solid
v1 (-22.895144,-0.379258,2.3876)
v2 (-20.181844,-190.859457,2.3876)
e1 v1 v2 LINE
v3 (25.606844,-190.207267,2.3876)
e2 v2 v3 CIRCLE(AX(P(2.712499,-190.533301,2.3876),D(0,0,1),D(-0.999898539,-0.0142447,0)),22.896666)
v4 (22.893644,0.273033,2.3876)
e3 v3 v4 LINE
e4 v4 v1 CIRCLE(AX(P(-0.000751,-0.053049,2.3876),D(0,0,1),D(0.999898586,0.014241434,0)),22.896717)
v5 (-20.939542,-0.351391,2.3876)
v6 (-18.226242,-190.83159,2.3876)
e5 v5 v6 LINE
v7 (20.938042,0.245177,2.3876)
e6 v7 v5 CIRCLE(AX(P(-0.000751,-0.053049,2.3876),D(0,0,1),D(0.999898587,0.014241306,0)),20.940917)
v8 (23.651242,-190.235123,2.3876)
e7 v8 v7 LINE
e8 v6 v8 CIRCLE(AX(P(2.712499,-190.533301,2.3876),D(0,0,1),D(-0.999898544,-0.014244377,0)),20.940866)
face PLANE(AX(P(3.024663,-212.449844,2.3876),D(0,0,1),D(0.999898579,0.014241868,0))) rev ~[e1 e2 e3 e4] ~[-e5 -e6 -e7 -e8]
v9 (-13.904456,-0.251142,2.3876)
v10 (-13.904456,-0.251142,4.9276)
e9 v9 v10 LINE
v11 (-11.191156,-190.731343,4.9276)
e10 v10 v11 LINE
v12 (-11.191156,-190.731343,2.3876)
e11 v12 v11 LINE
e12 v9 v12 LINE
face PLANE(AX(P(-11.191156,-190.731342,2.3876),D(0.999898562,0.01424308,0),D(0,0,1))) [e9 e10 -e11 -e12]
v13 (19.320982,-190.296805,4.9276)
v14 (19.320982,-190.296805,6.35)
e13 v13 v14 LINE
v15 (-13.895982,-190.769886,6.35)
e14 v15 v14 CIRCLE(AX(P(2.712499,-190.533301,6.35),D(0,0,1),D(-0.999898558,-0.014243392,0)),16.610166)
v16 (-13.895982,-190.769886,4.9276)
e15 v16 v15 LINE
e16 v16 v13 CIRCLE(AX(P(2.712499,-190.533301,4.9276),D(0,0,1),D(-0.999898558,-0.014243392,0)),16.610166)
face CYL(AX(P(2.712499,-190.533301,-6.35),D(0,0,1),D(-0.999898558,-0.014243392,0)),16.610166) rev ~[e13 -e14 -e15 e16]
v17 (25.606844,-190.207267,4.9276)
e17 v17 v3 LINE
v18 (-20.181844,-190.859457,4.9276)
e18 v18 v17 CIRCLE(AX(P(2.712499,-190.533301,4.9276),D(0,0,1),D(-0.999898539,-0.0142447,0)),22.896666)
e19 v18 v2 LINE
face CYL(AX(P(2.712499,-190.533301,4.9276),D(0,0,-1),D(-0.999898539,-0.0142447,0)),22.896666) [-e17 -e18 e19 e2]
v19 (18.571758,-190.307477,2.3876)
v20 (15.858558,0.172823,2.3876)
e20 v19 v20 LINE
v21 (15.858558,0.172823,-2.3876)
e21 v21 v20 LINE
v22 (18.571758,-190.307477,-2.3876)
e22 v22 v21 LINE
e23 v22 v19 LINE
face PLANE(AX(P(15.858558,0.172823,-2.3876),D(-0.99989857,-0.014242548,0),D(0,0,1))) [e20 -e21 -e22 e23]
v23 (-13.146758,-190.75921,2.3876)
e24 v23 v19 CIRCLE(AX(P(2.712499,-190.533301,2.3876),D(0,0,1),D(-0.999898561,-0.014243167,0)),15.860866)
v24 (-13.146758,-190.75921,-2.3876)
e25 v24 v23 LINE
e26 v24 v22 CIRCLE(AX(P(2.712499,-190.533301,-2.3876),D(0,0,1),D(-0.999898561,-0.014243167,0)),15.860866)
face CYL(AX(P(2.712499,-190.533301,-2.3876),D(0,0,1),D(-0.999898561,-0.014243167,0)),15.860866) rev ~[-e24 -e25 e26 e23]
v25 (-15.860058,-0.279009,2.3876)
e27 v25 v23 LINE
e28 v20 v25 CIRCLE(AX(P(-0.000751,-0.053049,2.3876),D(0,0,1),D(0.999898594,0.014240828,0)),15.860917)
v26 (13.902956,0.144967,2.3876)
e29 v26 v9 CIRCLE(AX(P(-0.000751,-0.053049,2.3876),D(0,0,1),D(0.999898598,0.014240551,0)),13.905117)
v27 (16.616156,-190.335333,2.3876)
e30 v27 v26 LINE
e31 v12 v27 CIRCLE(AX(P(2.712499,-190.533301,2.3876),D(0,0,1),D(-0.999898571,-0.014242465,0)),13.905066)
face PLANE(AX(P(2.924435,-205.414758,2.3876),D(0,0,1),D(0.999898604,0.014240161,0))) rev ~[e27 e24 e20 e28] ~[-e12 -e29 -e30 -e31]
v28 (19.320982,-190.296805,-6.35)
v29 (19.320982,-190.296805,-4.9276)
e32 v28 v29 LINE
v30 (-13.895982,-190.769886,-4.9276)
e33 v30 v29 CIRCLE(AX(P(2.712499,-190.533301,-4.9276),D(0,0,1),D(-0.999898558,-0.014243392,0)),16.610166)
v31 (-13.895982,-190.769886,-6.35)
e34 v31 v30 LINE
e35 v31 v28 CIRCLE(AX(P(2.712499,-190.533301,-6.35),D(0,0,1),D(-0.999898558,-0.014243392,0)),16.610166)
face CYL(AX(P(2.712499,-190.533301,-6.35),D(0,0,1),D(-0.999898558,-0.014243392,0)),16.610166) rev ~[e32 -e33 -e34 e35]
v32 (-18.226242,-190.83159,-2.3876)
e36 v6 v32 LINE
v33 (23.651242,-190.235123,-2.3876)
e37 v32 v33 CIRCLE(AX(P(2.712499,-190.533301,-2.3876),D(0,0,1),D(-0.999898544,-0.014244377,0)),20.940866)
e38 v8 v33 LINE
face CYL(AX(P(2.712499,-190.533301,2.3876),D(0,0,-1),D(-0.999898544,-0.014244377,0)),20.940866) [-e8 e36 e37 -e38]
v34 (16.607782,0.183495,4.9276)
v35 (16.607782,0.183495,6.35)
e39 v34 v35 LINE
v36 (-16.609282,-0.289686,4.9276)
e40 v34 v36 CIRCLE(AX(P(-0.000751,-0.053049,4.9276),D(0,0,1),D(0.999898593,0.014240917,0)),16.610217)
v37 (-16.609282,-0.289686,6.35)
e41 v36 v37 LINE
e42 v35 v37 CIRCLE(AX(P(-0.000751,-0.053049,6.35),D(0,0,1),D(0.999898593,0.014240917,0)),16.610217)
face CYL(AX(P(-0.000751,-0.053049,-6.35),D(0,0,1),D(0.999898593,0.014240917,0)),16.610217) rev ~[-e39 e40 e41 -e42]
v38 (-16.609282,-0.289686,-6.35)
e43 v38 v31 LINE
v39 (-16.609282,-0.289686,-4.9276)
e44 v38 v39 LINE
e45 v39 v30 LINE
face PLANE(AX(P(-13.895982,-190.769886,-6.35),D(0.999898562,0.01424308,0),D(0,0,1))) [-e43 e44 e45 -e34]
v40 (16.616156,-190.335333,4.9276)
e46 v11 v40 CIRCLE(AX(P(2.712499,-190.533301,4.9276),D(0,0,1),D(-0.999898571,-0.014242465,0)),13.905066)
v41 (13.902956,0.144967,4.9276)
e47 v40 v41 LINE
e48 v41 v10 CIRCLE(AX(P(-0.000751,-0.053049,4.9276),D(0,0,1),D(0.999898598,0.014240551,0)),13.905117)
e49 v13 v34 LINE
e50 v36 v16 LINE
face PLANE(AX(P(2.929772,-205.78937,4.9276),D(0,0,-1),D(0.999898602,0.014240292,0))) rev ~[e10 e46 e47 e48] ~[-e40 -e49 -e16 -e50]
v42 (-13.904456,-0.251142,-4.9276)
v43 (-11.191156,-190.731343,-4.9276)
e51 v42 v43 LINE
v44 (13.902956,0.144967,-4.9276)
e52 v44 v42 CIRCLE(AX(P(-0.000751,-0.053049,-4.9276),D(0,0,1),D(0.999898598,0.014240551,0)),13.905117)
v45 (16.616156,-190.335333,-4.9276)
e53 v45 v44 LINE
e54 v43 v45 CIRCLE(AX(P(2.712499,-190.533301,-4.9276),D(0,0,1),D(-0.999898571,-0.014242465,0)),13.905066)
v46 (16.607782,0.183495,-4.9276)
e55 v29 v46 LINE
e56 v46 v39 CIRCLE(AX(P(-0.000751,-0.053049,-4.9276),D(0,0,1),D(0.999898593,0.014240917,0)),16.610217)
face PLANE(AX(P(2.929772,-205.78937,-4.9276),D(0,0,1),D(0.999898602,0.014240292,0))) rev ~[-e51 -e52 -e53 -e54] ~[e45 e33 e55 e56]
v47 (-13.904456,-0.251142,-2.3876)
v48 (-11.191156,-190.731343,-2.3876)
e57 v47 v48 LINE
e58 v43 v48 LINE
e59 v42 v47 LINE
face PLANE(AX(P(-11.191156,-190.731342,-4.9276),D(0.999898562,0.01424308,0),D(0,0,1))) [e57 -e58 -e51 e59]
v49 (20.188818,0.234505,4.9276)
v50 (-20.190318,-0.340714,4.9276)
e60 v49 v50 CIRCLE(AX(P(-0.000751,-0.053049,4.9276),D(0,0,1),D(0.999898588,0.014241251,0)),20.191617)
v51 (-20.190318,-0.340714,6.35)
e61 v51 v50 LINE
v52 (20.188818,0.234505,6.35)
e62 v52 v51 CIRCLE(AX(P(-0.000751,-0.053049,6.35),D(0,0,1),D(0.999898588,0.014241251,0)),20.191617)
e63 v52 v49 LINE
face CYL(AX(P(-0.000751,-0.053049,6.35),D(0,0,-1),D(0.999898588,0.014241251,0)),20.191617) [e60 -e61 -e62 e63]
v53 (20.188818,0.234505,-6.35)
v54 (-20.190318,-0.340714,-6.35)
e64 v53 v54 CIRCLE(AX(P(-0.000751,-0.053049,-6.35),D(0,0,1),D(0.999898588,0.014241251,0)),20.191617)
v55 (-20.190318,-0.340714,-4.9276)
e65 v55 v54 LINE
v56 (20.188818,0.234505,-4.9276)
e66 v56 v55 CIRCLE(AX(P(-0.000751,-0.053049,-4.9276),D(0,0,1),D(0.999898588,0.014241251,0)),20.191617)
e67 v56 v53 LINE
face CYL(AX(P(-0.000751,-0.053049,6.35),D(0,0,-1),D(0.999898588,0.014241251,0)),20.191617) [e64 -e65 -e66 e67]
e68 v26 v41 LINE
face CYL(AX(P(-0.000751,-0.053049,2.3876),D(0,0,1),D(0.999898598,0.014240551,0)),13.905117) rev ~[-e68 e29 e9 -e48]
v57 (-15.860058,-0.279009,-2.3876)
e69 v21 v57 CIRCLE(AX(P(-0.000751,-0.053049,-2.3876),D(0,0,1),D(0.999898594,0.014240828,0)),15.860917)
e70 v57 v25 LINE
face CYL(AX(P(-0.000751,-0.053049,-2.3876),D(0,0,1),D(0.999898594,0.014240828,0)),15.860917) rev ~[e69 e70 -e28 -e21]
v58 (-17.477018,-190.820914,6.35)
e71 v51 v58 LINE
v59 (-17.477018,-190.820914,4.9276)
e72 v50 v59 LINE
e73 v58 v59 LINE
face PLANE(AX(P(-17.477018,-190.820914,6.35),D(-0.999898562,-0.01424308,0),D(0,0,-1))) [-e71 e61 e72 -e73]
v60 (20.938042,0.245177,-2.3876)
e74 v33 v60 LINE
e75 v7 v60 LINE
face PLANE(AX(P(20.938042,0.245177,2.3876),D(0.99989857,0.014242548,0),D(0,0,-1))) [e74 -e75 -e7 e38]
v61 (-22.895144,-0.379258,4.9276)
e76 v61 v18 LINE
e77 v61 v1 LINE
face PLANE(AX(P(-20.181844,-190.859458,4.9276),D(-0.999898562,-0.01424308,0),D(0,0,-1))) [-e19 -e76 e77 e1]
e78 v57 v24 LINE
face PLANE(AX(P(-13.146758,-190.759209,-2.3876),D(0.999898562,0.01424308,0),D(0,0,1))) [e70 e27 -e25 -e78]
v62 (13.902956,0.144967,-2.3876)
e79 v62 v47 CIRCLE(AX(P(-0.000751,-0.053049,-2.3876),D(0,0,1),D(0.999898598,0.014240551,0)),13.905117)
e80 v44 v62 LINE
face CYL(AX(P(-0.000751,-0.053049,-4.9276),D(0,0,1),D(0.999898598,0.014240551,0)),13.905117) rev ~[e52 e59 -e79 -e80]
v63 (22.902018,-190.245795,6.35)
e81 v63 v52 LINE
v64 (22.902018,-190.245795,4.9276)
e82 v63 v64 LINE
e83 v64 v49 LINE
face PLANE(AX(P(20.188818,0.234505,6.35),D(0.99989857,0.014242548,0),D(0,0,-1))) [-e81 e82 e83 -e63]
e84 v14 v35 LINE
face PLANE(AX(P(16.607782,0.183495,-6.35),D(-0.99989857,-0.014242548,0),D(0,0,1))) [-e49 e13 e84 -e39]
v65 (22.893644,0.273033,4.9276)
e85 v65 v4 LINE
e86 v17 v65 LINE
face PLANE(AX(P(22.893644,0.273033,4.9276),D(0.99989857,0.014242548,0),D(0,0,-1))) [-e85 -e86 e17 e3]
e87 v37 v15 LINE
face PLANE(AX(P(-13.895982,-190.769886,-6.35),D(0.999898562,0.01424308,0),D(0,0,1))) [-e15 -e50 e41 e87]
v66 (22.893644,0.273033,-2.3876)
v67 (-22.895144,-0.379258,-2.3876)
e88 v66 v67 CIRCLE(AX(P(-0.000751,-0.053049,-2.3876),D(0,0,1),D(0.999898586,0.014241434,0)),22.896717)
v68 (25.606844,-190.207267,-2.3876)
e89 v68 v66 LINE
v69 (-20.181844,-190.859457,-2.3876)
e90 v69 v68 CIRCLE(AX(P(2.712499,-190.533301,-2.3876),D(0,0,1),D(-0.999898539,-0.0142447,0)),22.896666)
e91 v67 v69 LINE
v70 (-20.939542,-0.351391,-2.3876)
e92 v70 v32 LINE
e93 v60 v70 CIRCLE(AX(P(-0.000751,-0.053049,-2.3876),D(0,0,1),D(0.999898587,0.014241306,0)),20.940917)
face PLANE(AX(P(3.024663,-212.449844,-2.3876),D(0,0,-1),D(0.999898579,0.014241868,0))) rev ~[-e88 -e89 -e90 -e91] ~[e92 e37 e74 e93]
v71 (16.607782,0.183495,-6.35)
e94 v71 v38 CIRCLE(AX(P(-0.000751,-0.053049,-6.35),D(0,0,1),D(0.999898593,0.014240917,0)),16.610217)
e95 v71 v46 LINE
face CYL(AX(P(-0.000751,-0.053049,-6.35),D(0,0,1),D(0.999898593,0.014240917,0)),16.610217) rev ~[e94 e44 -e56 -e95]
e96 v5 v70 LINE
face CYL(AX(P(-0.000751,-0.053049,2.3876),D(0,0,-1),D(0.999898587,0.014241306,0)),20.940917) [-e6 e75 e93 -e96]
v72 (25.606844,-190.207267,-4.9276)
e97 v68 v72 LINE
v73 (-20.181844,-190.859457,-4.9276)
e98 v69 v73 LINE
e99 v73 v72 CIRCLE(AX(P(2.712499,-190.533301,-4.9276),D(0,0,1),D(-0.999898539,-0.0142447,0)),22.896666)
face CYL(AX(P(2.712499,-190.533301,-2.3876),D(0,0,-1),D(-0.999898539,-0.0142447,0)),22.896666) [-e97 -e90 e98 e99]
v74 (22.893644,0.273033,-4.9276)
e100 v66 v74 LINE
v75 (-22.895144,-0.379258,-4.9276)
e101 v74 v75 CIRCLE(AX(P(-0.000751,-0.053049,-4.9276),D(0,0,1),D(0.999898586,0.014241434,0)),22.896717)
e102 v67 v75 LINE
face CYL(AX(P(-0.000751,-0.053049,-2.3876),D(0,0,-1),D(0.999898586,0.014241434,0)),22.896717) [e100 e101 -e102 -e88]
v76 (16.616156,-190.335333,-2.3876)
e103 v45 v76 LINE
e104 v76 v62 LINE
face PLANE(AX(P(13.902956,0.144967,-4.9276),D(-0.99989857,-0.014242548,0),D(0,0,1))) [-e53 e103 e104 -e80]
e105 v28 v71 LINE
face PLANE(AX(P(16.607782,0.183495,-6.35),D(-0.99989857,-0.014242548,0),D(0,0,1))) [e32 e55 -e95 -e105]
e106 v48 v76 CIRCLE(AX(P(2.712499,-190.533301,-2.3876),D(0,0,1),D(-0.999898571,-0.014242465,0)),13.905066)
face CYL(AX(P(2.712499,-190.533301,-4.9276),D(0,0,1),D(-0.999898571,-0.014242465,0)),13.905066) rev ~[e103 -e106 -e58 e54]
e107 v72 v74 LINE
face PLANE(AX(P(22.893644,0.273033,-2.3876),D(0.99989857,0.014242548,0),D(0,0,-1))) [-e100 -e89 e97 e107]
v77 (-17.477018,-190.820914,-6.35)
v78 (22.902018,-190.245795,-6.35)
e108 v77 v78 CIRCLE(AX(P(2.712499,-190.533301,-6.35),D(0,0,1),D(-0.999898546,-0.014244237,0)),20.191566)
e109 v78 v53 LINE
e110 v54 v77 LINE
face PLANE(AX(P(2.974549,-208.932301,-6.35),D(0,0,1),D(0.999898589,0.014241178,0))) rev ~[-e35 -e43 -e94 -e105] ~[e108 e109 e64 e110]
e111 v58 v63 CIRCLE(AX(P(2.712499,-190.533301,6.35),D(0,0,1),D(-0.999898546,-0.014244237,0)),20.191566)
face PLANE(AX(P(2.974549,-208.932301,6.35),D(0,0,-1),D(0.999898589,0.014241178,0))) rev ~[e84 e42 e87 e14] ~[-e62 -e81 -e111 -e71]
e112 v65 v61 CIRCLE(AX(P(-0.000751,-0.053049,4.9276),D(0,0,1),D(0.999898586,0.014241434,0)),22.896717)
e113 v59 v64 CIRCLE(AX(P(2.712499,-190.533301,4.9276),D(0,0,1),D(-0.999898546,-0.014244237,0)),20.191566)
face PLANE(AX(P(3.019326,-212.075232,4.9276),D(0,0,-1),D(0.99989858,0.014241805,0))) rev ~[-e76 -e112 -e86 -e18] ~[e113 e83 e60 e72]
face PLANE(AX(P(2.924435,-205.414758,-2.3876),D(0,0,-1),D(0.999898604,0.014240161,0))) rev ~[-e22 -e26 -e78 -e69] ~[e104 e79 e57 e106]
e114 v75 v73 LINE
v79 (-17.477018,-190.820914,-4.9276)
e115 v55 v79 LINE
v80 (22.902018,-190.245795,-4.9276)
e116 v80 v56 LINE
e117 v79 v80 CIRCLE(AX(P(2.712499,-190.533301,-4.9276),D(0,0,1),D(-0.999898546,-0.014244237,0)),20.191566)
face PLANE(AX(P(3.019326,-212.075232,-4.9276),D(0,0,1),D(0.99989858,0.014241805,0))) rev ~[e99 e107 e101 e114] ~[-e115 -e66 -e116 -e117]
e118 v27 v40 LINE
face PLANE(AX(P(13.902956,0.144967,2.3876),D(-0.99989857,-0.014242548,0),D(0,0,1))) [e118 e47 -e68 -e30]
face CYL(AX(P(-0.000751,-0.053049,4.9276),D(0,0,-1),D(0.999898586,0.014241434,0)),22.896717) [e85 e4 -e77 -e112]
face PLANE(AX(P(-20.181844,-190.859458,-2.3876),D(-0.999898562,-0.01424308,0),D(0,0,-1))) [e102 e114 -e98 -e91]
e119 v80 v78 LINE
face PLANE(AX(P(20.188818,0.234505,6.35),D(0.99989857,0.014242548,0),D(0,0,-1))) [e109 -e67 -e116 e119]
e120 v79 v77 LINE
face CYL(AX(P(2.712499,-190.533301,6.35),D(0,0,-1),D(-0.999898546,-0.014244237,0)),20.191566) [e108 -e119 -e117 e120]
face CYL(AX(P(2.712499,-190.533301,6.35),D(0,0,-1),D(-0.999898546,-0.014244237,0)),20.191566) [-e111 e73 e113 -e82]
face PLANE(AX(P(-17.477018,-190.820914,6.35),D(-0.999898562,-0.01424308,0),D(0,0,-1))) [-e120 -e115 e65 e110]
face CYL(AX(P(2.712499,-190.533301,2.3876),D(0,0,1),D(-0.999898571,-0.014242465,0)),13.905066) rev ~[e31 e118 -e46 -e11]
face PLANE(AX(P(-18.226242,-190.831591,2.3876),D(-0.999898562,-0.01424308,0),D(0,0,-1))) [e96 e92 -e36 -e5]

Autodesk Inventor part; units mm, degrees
ref_plane "Work Plane2" through (2.7125, -190.5333, 0) normal (-1, 0, 0) x (0, 0, 1)
ref_plane "Work Plane3" through (-0.0008, -0.0531, 0) normal (0, -1, 0) x (0, 0, 1)
sketch "Path" plane through (0, 0, 0) normal (0, 0, 1) x (1, 0, 0)
  arc A0 (-15.6865, -190.7954) -> (21.1115, -190.2713) centre (2.7125, -190.5333) ccw
  arc A1 (18.3983, 0.209) -> (-18.3998, -0.3152) centre (-0.0008, -0.0531) ccw
  line L0 (18.3983, 0.209) -> (21.1115, -190.2713)
  line L1 (-15.6865, -190.7954) -> (-18.3998, -0.3152)
  dimension "d31" = 8.9916
ref_plane "Section Plane" through (21.1115, -190.2713, 0) normal (-0.0142428, 0.9998986, 0) x (0, 0, 1)
sketch "Section Sketch" plane through (21.1115, -190.2713, 0) normal (-0.0142428, 0.9998986, 0) x (0, 0, 1)
  line L0 (-6.35, -1.7907) -> (6.35, -1.7907)
  line L1 (6.35, -1.7907) -> (6.35, 1.7907)
  line L2 (6.35, 1.7907) -> (-6.35, 1.7907)
  line L3 (-6.35, 1.7907) -> (-6.35, -1.7907)
  line L4 (-2.3876, -2.54) -> (2.3876, -2.54)
  line L5 (2.3876, -2.54) -> (2.3876, 2.54)
  line L6 (2.3876, 2.54) -> (-2.3876, 2.54)
  line L7 (-2.3876, 2.54) -> (-2.3876, -2.54)
  line L8 (-2.3876, 0) -> (2.3876, 0) construction
  line L9 (-4.9276, -4.4958) -> (-2.3876, -4.4958)
  line L10 (-2.3876, -4.4958) -> (-2.3876, 4.4958)
  line L11 (-2.3876, 4.4958) -> (-4.9276, 4.4958)
  line L12 (-4.9276, 4.4958) -> (-4.9276, -4.4958)
  line L13 (2.3876, -4.4958) -> (4.9276, -4.4958)
  line L14 (4.9276, -4.4958) -> (4.9276, 4.4958)
  line L15 (4.9276, 4.4958) -> (2.3876, 4.4958)
  line L16 (2.3876, 4.4958) -> (2.3876, -4.4958)
  line L17 (-6.35, 0) -> (6.35, 0) construction
  point P0 (0, 0)
  point P1 (0, 0)
  dimension "d21" = 3.5814
  dimension "d22" = 5.08
  dimension "d23" = 4.7752
  dimension "d24" = 2.54
  dimension "d31" = 8.9916
  dimension "d32" = 12.7
sweep "Solid" add profiles "Section Sketch" path "Path"
pattern_of_one "Strand Pattern"
equation "\"d21\" = da_d2"
equation "\"d22\" = da_d1"
equation "\"d23\" = da_b1"
equation "\"d24\" = da_t1 + da_t2"
equation "\"d30\" = da_pt"
equation "\"da_p\" = 9.525"
equation "\"da_b1\" = 4.7752"
equation "\"da_h2\" = 8.9916"
equation "\"da_h3\" = 7.7978"
equation "\"da_d1\" = 5.08"
equation "\"da_d2\" = 3.5814"
equation "\"da_pt\" = 10.1346"
equation "\"da_b\" = 12.7"
equation "\"da_t1\" = 1.27"
equation "\"da_t2\" = 1.27"
properties part number "Roller Chain"
